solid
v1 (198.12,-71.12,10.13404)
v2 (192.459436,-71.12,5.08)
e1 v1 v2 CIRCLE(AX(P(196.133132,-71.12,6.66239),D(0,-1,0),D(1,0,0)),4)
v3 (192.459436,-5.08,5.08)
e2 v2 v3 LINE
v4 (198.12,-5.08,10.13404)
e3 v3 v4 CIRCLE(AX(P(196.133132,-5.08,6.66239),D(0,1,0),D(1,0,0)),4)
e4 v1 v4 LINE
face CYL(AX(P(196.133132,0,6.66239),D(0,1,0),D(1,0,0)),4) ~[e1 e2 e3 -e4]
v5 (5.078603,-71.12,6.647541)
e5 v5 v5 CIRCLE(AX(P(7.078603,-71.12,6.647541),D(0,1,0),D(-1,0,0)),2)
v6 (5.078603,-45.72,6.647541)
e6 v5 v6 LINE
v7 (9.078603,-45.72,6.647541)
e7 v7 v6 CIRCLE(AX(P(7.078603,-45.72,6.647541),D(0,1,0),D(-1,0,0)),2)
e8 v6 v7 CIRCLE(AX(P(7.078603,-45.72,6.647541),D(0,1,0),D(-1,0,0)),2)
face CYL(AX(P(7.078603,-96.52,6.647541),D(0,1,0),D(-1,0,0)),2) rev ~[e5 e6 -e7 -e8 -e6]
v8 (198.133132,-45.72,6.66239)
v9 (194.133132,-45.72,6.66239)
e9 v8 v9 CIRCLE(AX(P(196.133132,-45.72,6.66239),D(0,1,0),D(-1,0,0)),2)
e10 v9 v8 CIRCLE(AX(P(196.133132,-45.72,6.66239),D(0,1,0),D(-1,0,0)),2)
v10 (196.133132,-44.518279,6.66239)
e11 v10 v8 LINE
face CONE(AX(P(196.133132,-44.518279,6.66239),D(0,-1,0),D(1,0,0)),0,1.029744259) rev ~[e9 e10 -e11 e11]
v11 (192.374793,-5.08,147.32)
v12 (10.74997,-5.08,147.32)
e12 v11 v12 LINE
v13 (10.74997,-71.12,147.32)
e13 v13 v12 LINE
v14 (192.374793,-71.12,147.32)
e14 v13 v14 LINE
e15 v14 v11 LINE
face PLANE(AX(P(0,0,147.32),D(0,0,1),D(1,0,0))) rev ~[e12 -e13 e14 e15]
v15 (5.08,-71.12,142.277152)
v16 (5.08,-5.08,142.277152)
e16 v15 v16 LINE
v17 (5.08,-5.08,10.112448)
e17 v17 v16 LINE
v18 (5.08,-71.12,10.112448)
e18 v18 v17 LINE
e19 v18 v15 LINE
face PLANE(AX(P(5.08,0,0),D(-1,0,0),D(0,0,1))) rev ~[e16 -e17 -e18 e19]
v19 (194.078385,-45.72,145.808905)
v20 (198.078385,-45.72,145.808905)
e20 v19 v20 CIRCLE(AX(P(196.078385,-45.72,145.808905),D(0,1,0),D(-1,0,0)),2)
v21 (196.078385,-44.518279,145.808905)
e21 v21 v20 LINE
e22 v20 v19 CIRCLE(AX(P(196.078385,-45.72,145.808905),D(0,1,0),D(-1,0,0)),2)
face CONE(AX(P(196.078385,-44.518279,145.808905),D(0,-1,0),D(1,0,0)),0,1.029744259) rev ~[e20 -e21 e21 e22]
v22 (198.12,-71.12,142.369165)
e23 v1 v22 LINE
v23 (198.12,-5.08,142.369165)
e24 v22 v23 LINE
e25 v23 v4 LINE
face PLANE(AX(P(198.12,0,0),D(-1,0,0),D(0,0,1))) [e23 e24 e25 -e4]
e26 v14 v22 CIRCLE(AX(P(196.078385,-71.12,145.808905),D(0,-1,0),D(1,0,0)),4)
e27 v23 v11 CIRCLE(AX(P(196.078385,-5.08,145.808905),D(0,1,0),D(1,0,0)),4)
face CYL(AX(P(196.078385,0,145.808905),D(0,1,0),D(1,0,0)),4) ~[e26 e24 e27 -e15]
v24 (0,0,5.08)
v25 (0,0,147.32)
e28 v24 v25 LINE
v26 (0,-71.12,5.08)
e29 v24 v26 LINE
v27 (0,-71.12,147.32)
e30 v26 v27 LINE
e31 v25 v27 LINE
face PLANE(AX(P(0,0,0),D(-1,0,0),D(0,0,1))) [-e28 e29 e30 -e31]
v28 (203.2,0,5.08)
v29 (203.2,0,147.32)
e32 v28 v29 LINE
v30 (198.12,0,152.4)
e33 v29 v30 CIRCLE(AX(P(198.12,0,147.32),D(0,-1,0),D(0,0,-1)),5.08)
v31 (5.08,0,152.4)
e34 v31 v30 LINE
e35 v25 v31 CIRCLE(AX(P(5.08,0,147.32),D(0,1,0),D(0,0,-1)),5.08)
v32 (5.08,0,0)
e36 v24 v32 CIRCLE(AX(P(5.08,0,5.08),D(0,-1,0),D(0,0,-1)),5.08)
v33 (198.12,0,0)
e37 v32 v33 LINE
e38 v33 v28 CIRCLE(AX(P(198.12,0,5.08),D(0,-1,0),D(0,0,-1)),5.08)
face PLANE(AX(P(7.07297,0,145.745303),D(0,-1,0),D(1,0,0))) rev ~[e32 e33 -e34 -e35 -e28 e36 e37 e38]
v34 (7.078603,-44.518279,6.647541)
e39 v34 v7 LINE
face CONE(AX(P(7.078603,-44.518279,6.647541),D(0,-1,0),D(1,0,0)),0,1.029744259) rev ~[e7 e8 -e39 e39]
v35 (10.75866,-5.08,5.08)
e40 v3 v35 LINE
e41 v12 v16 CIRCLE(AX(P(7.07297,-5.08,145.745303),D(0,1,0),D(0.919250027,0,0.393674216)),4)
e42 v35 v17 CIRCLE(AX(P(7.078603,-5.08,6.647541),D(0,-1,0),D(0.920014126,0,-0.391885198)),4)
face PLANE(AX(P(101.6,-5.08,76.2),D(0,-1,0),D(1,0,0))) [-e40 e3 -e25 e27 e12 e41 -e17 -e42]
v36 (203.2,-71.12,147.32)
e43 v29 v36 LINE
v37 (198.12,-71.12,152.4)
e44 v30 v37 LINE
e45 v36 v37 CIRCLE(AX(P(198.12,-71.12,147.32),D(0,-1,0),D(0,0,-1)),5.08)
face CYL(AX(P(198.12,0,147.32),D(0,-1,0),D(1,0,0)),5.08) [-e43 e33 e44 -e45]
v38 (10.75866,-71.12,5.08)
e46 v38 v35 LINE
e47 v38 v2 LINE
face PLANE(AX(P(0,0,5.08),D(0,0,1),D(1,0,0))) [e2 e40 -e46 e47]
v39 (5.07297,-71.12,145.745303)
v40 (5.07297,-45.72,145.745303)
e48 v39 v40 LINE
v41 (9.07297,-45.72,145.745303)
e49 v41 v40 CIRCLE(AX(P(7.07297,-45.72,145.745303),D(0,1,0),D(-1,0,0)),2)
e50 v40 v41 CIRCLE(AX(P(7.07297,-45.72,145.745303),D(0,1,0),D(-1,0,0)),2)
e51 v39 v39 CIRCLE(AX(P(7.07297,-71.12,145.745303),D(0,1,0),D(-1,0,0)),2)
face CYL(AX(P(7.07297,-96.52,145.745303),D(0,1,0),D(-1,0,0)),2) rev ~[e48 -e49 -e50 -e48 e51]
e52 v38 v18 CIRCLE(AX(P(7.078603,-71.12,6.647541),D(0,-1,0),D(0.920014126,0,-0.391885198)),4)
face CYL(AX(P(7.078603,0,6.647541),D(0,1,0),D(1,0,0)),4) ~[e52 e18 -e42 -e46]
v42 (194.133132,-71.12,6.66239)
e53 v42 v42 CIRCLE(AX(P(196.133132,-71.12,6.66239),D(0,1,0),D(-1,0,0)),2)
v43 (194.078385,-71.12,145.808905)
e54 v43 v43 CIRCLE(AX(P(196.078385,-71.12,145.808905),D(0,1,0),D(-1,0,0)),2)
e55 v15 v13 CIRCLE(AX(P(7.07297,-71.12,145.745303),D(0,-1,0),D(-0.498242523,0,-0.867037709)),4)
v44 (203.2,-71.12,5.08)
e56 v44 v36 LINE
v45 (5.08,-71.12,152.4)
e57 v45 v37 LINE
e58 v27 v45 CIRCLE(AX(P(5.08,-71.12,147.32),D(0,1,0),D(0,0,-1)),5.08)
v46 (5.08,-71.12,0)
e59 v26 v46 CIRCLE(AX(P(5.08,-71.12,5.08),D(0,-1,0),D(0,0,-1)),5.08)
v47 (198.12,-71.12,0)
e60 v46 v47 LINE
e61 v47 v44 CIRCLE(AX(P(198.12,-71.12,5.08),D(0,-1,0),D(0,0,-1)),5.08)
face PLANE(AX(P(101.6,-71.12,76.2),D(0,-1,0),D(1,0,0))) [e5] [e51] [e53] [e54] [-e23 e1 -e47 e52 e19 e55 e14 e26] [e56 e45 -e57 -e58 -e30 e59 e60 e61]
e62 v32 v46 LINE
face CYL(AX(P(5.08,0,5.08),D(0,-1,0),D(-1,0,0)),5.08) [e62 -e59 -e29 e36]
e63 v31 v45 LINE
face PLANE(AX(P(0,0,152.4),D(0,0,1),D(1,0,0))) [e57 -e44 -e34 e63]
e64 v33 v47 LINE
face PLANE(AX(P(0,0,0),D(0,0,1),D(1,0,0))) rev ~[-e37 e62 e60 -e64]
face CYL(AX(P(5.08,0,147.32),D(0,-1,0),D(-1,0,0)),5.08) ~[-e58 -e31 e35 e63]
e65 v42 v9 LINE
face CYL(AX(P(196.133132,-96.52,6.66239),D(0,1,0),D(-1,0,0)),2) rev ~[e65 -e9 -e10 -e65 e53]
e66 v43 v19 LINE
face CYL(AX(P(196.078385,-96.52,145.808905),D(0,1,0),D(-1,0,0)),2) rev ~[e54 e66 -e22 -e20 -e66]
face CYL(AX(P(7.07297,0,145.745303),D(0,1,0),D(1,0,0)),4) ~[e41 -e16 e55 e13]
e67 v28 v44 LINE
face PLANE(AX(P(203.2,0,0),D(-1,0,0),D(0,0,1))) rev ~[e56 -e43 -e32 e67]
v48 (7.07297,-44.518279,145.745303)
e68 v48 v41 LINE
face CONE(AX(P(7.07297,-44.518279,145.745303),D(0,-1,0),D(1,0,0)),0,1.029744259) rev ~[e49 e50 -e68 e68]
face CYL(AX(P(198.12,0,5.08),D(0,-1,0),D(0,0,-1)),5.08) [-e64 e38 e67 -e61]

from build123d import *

# Parameters (mm, degrees)
F0_W     = 203.2
F0_H     = 152.4
F1_DEPTH = 71.12
F2_R     = 5.08
F3_T     = 5.08
F4_R     = 4
F5_DEPTH = 71.12
F7_D     = 4
F7_DEPTH = 25.4
F7_TIP   = 1.2017212381


# Not quite as in the source:
# - a shell that OpenCascade refuses in one call is made with other operations: the cavity is built on its own and cut out


with BuildPart() as f1:
    # F0 (on Front) → F1 (new body)
    with BuildSketch(Plane.XZ):
        with Locations((101.6, 76.2)):
            Rectangle(F0_W, F0_H)
    extrude(amount=F1_DEPTH)

    # F2
    f2_edges = [f1.edges().sort_by_distance(p)[0] for p in [
        (0, -35.56, 152.4),
        (0, -35.56, 0),
        (203.2, -35.56, 152.4),
        (203.2, -35.56, 0),
    ]]
    fillet(f2_edges, radius=F2_R)

    # F3: shell of thickness 5.08, made by hand


with BuildPart() as f3_core1:
    # F3_t2: copy of F1
    add(f1.part)

    # the walls: a layer under each face that stays
    f3_faces = [f3_core1.faces().sort_by_distance(p)[0] for p in [
        (0, -35.56, 76.2),
        (101.6, 0, 76.2),
        (101.6, -35.56, 152.4),
        (101.6, -35.56, 0),
        (203.2, -35.56, 76.2),
    ]]
    thicken(f3_faces, amount=-F3_T, mode=Mode.SUBTRACT)


with BuildPart() as f1_1:
    add(f1.part)

    # what is left inside the walls is the cavity
    f3_cavity = [f3_core1.part.solids().sort_by_distance(p)[0] for p in [
        (101.6, -5.1308, 52.493333),
    ]]
    add(f3_cavity, mode=Mode.SUBTRACT)

    # F4 (on Front) → F5 (join)
    with BuildSketch(Plane.XZ):
        with Locations((7.0729700904, 145.7453031343)):
            Circle(F4_R)
        with Locations((196.0783849807, 145.8089049954)):
            Circle(F4_R)
        with Locations((7.0786034794, 6.6475407913)):
            Circle(F4_R)
        with Locations((196.1331322956, 6.6623895618)):
            Circle(F4_R)
    extrude(amount=F5_DEPTH)

    # F7
    with Locations(Plane.XZ.offset(71.12)):
        with Locations((7.0729700904, 145.7453031343), (7.0786034794, 6.6475407913), (196.1331322956, 6.6623895618), (196.0783849807, 145.8089049954)):
            Hole(F7_D / 2, depth=F7_DEPTH)
            with Locations((0, 0, -(F7_DEPTH + F7_TIP / 2))):  # 118° drill point
                Cone(0, F7_D / 2, F7_TIP, mode=Mode.SUBTRACT)


solid = f1_1.part
